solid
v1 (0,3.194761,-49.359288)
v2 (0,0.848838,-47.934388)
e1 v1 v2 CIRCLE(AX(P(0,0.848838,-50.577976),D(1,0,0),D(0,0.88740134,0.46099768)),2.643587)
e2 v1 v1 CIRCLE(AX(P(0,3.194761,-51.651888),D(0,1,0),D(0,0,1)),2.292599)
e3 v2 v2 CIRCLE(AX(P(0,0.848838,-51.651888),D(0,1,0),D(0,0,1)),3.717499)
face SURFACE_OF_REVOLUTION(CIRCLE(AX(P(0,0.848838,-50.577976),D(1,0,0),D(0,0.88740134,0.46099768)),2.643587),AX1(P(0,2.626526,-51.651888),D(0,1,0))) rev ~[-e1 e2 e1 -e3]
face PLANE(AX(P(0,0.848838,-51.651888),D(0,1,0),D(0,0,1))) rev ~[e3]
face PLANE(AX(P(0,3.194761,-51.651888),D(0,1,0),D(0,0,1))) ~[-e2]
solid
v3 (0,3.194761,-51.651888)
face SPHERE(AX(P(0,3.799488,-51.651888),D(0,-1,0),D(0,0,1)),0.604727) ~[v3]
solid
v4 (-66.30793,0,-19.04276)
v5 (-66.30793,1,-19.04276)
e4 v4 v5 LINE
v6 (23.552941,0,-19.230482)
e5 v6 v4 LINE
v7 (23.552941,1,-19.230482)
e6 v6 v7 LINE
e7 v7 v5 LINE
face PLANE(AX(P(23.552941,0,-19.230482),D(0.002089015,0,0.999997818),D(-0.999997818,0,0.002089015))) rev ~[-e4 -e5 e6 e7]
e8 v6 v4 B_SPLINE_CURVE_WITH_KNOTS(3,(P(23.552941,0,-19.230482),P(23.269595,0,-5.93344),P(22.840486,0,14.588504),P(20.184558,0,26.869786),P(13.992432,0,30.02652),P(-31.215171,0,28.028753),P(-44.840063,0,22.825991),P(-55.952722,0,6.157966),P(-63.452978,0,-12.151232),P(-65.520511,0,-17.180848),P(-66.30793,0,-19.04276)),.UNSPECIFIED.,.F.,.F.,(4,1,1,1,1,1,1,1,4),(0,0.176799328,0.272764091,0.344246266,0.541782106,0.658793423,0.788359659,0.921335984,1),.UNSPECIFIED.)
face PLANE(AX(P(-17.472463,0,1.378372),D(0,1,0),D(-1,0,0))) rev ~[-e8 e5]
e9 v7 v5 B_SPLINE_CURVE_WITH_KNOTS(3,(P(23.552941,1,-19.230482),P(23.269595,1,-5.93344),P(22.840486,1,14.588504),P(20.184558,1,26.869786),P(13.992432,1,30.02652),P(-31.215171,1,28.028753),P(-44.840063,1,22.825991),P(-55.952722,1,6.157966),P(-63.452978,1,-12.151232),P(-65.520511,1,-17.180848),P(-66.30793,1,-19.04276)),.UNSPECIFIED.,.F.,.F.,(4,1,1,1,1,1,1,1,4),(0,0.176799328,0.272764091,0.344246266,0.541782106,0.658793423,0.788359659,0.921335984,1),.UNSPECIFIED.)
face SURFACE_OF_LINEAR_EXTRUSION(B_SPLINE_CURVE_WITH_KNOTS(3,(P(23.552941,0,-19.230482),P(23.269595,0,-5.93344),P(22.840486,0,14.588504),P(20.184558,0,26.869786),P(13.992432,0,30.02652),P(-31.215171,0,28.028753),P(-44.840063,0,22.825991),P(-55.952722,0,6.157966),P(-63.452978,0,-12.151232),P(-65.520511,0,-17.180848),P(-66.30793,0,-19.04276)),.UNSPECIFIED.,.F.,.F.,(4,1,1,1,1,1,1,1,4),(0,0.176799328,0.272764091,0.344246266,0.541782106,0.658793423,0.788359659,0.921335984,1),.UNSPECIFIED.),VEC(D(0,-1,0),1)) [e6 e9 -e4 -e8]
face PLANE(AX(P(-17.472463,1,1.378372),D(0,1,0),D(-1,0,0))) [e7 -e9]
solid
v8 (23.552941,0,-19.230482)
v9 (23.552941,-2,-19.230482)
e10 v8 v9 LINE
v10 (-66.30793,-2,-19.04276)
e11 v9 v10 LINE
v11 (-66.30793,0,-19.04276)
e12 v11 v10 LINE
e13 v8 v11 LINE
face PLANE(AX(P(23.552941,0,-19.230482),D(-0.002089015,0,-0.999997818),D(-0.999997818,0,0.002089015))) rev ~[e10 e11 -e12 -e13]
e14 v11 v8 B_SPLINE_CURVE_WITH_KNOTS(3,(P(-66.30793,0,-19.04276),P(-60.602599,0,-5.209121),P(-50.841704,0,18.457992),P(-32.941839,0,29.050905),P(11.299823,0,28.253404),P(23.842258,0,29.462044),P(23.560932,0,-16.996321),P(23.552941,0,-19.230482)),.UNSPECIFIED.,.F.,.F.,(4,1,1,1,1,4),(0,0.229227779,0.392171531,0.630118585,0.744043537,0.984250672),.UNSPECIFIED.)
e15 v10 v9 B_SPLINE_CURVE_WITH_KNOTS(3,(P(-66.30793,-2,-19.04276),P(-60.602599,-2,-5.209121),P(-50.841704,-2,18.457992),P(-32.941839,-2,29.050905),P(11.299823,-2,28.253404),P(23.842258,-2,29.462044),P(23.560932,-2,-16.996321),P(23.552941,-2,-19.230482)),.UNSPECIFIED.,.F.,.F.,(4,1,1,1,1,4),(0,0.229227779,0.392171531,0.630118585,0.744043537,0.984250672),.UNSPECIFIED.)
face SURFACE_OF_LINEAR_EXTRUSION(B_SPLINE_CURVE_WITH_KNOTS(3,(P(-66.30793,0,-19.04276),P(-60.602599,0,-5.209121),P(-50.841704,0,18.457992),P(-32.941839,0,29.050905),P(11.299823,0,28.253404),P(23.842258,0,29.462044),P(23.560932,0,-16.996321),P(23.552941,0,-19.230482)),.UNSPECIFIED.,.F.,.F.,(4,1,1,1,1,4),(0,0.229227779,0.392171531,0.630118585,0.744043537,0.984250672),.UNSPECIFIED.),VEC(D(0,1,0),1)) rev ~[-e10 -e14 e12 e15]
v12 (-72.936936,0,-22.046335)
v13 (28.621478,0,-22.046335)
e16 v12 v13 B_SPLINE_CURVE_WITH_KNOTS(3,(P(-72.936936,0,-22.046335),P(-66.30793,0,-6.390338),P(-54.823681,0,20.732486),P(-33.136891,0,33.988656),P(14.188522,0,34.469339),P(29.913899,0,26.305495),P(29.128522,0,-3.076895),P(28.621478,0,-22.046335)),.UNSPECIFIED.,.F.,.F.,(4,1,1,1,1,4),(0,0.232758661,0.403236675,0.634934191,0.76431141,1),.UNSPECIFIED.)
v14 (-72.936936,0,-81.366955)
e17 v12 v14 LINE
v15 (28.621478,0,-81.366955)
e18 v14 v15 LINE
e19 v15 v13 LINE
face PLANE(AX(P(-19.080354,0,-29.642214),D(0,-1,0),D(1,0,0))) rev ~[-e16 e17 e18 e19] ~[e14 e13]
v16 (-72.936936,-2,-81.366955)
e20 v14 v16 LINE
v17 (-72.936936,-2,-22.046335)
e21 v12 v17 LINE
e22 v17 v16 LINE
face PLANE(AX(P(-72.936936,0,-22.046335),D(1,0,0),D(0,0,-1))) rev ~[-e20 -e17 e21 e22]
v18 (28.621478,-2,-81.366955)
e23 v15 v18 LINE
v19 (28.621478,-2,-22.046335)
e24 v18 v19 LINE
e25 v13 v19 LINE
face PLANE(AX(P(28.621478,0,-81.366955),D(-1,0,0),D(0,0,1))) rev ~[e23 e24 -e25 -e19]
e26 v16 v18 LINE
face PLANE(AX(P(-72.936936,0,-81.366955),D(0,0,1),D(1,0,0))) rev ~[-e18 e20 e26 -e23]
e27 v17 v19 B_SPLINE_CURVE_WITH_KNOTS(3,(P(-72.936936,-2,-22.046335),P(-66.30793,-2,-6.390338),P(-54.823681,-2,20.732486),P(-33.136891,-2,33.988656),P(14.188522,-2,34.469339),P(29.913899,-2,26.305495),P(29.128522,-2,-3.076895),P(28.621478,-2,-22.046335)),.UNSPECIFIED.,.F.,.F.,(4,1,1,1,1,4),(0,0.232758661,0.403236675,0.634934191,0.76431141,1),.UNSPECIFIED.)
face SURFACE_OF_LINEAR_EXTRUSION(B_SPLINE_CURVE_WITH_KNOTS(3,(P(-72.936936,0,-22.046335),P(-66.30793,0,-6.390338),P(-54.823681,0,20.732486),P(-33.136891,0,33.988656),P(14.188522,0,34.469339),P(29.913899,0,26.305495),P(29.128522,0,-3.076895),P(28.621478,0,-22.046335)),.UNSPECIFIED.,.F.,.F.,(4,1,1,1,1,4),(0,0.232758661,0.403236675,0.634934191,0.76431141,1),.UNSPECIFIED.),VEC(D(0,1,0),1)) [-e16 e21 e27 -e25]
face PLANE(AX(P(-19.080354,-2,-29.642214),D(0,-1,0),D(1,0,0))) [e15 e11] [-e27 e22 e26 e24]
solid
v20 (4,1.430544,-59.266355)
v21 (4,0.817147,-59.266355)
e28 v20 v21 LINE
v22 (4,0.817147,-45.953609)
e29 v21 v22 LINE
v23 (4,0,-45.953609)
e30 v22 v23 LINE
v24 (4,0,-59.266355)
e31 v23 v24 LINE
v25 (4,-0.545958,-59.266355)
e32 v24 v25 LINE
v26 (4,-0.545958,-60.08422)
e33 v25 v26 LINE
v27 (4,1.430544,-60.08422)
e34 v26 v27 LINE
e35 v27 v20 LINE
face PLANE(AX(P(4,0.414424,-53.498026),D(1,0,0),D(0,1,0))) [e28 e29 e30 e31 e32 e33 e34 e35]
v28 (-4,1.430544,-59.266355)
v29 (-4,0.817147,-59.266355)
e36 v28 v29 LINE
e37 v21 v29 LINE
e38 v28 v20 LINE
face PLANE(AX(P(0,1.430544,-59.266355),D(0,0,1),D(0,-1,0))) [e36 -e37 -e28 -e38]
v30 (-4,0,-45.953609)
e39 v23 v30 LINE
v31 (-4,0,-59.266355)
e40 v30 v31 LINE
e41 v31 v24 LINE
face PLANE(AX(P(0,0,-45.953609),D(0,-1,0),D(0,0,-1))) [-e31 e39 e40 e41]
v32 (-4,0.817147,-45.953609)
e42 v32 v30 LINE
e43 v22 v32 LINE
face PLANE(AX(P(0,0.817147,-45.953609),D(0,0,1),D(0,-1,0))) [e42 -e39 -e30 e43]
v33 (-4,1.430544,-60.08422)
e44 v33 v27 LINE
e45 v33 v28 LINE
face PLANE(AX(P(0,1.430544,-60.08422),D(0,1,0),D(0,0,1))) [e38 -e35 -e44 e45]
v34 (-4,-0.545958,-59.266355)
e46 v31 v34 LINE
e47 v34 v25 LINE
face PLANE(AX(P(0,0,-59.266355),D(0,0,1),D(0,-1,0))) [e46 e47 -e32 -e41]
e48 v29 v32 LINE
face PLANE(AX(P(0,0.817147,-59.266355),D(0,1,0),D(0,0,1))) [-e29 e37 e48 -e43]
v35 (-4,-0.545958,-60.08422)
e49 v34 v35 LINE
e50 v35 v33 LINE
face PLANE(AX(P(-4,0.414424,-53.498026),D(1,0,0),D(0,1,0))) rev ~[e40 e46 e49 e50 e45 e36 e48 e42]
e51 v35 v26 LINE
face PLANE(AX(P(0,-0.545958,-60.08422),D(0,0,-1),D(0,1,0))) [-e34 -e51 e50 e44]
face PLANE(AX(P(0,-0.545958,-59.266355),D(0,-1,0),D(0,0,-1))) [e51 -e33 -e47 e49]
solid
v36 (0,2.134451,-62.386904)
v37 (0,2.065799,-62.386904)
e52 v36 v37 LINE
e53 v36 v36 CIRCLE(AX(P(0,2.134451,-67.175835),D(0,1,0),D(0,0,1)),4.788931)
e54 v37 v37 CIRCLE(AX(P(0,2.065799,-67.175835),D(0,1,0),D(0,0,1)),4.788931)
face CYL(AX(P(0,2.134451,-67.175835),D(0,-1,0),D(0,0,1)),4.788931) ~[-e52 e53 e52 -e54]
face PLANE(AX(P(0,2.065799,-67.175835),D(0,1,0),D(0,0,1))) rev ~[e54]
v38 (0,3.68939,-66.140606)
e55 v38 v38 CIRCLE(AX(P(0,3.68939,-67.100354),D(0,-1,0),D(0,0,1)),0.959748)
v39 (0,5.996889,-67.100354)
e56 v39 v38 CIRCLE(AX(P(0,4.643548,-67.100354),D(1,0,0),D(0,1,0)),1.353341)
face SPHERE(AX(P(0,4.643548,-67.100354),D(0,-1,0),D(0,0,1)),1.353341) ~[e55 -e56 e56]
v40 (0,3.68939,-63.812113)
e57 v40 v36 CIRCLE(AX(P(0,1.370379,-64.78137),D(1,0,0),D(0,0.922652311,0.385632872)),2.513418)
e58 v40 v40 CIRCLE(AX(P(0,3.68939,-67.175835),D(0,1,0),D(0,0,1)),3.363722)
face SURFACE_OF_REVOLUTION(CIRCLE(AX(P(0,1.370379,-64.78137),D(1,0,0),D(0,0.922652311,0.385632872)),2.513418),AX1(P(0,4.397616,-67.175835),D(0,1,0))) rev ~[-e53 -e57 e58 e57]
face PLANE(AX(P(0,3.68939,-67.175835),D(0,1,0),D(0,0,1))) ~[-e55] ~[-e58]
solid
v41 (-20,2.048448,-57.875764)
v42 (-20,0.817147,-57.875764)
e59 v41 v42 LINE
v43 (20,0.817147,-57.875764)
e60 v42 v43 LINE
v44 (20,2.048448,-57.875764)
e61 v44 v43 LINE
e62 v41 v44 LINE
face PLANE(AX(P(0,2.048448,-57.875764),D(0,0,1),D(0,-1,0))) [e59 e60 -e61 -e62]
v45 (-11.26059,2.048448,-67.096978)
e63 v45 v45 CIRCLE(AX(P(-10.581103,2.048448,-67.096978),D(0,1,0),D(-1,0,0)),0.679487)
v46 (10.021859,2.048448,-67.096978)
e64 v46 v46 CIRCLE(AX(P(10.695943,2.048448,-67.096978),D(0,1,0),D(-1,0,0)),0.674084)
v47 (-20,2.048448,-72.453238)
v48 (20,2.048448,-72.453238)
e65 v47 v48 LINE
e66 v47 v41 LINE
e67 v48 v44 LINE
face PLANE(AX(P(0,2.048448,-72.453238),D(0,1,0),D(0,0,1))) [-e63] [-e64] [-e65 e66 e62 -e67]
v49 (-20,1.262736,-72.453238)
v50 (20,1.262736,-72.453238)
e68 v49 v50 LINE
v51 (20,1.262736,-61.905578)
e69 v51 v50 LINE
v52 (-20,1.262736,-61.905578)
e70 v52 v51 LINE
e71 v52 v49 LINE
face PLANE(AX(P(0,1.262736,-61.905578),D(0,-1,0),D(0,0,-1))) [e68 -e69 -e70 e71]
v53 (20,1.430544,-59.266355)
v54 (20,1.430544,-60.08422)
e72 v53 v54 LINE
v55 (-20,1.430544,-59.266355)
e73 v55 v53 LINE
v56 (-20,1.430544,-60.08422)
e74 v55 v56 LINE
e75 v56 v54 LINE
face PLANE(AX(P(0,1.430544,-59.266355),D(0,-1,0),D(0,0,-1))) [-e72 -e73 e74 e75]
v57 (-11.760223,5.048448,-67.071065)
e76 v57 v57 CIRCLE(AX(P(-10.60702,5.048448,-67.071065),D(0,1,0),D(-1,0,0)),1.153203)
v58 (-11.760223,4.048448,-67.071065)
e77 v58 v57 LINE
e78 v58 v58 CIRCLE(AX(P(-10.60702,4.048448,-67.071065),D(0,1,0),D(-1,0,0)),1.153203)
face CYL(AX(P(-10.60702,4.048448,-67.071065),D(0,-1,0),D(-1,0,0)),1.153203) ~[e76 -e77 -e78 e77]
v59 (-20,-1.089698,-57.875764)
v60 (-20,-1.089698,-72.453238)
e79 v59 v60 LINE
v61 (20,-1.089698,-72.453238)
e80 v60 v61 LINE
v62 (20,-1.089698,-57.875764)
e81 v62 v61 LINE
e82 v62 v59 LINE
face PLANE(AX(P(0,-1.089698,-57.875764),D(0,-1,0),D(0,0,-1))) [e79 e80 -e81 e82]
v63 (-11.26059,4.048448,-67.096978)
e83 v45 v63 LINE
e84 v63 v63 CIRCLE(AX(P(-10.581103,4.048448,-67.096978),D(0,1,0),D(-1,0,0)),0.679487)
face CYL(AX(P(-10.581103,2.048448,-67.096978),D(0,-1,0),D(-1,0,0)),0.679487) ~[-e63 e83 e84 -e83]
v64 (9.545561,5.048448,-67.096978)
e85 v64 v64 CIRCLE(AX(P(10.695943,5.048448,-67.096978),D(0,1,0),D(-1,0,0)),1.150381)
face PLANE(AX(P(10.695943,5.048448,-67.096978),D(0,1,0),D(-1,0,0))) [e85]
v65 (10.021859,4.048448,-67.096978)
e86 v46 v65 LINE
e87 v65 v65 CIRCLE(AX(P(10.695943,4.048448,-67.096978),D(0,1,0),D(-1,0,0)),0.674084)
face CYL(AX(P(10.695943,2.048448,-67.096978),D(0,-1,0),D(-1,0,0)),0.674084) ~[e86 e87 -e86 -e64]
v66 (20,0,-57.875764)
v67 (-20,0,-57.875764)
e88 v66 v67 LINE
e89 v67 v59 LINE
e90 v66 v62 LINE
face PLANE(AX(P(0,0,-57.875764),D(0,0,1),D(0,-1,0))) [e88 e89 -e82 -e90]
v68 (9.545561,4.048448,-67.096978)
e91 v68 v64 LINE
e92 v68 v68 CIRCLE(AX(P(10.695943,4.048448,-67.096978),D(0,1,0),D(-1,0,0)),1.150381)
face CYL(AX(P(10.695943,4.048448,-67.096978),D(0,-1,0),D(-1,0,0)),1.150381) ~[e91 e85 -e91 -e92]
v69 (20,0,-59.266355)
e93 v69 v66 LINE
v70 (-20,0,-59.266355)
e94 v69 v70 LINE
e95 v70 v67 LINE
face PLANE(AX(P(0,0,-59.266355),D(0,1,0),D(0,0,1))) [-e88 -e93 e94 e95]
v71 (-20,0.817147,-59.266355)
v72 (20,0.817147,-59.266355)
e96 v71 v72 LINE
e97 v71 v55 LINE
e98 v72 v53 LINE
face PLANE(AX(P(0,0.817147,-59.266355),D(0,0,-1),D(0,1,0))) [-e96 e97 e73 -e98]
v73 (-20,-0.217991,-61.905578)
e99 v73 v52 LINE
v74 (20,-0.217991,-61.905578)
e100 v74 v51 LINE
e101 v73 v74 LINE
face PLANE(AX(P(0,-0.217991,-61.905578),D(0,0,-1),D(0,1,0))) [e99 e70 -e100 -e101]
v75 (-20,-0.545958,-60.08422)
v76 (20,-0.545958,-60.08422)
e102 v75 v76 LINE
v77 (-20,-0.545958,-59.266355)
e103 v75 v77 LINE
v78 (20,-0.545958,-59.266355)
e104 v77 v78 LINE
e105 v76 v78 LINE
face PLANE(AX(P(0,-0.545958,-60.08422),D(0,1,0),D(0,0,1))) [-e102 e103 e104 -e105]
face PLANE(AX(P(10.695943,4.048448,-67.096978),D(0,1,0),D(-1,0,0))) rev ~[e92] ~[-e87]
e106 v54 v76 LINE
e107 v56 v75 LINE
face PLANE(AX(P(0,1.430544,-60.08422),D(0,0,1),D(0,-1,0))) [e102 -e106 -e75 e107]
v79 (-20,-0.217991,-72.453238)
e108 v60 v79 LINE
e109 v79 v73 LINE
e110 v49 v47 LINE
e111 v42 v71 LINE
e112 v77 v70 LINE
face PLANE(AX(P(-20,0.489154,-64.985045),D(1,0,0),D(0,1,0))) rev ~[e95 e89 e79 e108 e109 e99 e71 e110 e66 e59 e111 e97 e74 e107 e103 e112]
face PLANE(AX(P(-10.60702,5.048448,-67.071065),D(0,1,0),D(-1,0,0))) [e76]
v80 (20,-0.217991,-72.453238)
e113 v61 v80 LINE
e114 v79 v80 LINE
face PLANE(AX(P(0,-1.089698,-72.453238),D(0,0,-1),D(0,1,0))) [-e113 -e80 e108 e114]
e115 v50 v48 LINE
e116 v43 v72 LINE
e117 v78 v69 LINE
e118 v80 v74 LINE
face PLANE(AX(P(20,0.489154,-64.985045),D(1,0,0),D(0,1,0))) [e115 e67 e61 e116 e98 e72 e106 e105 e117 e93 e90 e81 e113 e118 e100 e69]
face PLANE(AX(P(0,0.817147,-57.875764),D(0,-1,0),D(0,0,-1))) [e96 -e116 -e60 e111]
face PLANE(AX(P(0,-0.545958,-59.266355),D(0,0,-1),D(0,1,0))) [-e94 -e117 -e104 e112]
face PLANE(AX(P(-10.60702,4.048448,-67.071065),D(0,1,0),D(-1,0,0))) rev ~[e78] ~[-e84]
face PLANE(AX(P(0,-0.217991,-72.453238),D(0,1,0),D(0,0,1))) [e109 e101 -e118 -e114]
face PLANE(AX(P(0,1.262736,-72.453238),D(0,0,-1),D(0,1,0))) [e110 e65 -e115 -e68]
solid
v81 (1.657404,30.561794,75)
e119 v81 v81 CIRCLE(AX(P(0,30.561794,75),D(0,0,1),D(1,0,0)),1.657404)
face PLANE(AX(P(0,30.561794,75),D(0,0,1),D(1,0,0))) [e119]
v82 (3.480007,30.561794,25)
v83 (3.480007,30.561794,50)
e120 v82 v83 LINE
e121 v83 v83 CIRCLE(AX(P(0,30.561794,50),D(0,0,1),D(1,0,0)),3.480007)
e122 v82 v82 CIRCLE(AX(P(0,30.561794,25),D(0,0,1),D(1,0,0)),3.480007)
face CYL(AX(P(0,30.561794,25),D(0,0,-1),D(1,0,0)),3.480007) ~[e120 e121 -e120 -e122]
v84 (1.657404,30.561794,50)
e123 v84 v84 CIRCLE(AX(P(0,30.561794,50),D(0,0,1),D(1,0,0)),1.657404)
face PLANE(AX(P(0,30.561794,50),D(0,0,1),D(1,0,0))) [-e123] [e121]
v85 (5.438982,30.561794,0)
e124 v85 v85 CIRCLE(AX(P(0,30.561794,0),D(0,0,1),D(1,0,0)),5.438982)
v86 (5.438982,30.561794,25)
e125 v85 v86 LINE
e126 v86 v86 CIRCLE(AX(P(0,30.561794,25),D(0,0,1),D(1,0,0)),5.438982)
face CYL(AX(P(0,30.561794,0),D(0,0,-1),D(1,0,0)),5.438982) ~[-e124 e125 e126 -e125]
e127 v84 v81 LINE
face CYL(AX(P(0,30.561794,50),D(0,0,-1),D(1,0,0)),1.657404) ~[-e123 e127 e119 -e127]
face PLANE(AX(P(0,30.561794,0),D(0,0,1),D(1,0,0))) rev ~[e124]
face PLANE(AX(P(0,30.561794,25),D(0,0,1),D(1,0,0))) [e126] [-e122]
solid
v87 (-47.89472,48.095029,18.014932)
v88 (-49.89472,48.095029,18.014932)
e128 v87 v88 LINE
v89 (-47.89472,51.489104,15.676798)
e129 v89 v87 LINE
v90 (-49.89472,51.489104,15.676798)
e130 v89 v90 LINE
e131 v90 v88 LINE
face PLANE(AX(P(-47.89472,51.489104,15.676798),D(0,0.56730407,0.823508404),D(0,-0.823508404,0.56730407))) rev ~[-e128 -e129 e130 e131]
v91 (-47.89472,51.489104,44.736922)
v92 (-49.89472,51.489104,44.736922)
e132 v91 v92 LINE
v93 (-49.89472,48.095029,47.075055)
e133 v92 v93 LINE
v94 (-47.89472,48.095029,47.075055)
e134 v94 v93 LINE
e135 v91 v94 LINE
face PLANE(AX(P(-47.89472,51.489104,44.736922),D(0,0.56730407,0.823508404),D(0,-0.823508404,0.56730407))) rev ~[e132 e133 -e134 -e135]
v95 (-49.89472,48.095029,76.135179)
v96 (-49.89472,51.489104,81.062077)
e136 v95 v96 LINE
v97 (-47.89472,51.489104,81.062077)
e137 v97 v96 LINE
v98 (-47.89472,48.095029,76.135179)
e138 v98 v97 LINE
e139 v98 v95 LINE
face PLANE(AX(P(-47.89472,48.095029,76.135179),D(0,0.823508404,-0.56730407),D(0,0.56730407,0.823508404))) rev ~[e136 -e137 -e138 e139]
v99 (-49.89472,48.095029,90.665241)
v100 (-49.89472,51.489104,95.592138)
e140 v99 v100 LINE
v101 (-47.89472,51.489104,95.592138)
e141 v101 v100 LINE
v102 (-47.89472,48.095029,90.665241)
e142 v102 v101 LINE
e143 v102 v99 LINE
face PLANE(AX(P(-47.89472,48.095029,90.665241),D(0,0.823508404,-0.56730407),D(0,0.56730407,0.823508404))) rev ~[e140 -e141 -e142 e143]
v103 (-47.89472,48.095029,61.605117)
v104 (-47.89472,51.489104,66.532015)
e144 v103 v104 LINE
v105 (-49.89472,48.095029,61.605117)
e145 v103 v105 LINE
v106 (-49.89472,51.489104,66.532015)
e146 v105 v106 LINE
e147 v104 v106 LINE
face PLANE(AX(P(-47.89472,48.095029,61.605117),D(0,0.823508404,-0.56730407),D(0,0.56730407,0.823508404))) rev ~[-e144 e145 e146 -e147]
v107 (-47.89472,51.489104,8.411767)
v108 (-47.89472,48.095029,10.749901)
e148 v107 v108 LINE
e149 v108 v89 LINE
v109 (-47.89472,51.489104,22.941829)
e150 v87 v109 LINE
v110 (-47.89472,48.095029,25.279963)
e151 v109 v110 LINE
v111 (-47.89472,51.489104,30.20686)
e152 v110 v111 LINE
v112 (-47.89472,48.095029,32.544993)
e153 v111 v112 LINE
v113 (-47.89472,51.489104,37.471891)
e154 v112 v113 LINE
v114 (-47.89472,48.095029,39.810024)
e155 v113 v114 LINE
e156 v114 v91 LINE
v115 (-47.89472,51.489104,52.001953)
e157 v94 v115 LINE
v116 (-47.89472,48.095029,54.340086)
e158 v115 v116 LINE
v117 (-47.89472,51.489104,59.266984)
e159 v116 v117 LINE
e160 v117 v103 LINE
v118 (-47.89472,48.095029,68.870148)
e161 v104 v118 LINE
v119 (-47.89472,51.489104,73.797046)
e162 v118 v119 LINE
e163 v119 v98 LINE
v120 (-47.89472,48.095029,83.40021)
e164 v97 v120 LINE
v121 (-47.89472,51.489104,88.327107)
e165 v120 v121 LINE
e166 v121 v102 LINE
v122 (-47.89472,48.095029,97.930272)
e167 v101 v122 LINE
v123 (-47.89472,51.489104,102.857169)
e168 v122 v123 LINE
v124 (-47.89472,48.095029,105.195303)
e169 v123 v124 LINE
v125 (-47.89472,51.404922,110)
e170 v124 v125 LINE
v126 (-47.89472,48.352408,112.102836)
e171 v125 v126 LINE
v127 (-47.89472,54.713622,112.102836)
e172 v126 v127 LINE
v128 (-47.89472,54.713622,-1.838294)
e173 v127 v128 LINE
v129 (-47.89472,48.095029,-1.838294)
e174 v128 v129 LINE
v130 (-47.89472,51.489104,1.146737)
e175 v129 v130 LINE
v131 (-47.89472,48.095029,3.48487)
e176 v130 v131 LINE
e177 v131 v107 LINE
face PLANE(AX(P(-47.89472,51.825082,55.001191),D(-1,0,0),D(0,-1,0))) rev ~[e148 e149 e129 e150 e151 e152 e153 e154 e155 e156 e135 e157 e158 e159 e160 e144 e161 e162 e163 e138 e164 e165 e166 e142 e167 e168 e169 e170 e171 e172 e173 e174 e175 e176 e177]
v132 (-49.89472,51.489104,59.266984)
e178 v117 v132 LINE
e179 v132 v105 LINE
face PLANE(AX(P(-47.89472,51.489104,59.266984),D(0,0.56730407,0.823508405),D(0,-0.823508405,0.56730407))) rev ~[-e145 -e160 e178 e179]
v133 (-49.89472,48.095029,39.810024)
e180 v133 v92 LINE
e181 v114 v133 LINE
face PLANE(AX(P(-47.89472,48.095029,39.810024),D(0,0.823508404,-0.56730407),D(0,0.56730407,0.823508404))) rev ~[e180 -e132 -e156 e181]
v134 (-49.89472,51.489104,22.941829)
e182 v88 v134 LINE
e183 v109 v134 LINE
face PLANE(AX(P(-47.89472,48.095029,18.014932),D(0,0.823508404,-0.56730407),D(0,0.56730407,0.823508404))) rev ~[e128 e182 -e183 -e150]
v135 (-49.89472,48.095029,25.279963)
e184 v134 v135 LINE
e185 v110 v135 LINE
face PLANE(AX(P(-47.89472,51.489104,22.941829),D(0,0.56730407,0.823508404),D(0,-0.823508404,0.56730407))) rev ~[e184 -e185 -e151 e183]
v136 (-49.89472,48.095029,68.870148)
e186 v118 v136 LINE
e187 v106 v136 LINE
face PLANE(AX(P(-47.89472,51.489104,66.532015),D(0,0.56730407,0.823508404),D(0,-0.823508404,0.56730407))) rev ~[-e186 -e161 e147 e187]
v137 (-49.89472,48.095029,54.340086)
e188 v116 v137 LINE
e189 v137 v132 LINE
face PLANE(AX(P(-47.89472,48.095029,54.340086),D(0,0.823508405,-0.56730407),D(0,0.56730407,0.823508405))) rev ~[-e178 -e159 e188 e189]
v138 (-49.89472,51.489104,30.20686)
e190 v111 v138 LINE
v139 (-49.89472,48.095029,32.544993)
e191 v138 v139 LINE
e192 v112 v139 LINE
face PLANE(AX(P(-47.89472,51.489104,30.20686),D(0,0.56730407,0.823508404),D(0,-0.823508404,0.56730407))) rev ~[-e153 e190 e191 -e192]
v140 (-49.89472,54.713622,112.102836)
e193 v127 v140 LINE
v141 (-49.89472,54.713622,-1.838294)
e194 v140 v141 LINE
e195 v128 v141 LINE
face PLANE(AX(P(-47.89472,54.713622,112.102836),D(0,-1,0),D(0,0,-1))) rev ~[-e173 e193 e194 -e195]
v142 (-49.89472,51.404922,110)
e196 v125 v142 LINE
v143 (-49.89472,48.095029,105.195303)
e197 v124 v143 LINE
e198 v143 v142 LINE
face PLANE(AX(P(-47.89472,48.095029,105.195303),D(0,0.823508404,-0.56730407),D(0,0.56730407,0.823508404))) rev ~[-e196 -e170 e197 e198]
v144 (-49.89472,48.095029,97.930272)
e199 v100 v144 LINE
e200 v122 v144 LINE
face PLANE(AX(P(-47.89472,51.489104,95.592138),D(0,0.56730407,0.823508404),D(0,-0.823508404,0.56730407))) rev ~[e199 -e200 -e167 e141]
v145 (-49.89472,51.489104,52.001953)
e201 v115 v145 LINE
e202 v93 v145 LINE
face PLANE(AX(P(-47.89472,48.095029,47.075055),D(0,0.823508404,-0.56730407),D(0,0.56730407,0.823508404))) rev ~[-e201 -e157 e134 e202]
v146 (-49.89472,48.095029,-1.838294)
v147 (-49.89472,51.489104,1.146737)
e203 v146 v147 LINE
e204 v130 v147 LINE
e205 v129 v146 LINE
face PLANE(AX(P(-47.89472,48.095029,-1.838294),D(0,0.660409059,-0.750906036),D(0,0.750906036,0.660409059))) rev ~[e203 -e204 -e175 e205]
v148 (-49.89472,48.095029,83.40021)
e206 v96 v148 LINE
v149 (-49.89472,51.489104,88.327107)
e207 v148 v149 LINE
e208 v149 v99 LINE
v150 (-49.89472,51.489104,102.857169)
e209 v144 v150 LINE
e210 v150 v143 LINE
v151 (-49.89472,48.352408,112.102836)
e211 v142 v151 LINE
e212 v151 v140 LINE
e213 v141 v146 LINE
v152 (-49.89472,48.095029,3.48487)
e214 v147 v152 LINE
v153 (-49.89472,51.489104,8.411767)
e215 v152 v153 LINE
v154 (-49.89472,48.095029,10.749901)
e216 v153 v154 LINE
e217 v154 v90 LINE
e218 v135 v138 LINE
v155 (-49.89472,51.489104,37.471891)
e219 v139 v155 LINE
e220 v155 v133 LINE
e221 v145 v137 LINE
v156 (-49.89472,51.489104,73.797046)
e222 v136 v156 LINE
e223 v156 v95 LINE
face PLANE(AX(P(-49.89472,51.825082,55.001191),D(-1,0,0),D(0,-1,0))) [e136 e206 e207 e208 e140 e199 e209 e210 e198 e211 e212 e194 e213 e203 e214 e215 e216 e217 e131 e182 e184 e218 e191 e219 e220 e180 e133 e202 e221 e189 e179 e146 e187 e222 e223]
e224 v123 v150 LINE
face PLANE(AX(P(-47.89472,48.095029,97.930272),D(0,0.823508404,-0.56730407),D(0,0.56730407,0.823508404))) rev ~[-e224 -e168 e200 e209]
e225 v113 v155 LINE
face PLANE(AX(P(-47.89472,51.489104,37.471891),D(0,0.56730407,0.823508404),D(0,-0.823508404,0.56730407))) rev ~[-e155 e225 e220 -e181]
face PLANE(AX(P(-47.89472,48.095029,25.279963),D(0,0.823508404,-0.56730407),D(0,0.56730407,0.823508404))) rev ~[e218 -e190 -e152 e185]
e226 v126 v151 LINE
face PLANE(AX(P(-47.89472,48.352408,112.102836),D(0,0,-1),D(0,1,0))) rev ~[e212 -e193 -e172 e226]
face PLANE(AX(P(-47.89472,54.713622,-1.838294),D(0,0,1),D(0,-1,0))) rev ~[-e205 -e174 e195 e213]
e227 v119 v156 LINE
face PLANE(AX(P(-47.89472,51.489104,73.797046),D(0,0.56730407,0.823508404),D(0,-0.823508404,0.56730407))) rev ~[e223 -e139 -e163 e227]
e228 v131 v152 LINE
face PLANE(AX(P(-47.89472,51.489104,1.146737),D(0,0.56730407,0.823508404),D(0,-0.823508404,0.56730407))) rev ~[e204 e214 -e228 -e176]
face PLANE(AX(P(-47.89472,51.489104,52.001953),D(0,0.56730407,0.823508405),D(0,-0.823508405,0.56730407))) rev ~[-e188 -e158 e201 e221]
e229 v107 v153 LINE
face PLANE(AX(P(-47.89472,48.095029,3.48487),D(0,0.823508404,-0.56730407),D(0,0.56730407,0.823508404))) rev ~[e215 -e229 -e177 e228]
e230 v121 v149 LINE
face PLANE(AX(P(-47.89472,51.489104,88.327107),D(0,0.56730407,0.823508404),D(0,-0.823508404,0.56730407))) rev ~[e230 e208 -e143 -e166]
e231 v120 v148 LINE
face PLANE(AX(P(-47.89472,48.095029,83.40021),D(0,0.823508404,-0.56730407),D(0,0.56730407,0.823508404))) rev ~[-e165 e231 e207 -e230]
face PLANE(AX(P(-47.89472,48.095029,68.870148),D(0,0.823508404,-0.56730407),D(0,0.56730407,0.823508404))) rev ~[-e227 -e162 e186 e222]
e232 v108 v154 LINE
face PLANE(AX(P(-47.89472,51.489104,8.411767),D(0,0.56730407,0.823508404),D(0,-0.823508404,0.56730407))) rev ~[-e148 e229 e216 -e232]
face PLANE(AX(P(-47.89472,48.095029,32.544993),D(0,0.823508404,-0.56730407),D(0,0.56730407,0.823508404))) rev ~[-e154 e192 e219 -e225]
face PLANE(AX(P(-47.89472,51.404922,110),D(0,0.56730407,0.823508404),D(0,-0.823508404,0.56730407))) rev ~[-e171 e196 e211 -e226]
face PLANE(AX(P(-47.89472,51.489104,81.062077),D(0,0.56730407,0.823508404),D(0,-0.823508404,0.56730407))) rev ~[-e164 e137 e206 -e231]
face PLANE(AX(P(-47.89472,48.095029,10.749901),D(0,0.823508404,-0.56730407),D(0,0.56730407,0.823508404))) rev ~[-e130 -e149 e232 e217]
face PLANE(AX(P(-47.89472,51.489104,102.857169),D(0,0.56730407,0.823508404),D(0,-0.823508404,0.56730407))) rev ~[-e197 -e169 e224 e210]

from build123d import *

# Parameters (mm, degrees)
F1_DEPTH  = 2
F3_DEPTH  = 1
F5_DEPTH  = 20
F6_R      = 0.6740837688
F6_R_2    = 0.6794872763
F7_DEPTH  = 2
F8_R      = 1.1503813394
F8_R_2    = 1.1532026448
F9_DEPTH  = 1
F14_W     = 3.547757864
F14_H     = 3.547757864
F15_DEPTH = 110
F16_DEPTH = 4
F17_R     = 5.4389816306
F18_DEPTH = 25
F19_R     = 3.4800068769
F20_DEPTH = 25
F21_R     = 1.6574043711
F22_DEPTH = 25
F25_DEPTH = 25
F27_DEPTH = 2


# Not quite as in the source:
# - a feature names something its author has since deleted; it is built from what else it names


with BuildPart() as f1:
    # F0 (on Front) → F1 (new body)
    with BuildSketch(Plane.XZ):
        with BuildLine():
            Line((-72.9369357123, -81.3669546917), (28.6214776443, -81.3669546917))
            Line((28.6214776443, -81.3669546917), (28.6214776443, -22.0463353619))
            add(Edge.make_bspline(
                [(-72.9369357123, -22.0463353619), (-66.3079296953, -6.3903379982), (-54.8236810491, 20.7324864598), (-33.1368908634, 33.9886563081), (14.1885215953, 34.4693387216), (29.9138992328, 26.3054952003), (29.1285218253, -3.0768949366), (28.6214776443, -22.0463353619)],
                knots=[0, 0, 0, 0, 0.2327586614, 0.4032366747, 0.6349341911, 0.7643114096, 1, 1, 1, 1], degree=3))
            Line((-72.9369357123, -22.0463353619), (-72.9369357123, -81.3669546917))
        make_face()
        with BuildLine():
            Line((23.5529407965, -19.2304815576), (-66.3079296953, -19.0427604541))
            add(Edge.make_bspline(
                [(-66.3079296953, -19.0427604541), (-60.6025988038, -5.2091205775), (-50.8417035049, 18.4579923395), (-32.9418385651, 29.0509048337), (11.2998233245, 28.2534036027), (23.8422582571, 29.4620440208), (23.5609324216, -16.9963213799), (23.5529407965, -19.2304815576)],
                knots=[0, 0, 0, 0, 0.2292277789, 0.3921715308, 0.6301185848, 0.7440435368, 0.9842506716, 0.9842506716, 0.9842506716, 0.9842506716], degree=3))
        make_face(mode=Mode.SUBTRACT)
    extrude(amount=F1_DEPTH)


with BuildPart() as f3:
    # F2 (on face) → F3 (new body)
    with BuildSketch(Plane(origin=(0, 0, 0), x_dir=(-1, 0, 0), z_dir=(0, 1, 0))):
        with BuildLine():
            Line((-23.5529407964, -19.2304815668), (66.3079296953, -19.0427604541))
            add(Edge.make_bspline(
                [(-23.5529407964, -19.2304815668), (-23.269595086, -5.9334404727), (-22.8404862365, 14.5885042855), (-20.184558271, 26.8697861091), (-13.9924322403, 30.0265202781), (31.2151711749, 28.02875343), (44.8400626895, 22.8259909303), (55.9527219343, 6.1579662544), (63.45297845, -12.1512318258), (65.5205113196, -17.1808483014), (66.3079296953, -19.0427604541)],
                knots=[0, 0, 0, 0, 0.1767993283, 0.2727640909, 0.3442462663, 0.5417821056, 0.6587934226, 0.788359659, 0.9213359844, 1, 1, 1, 1], degree=3))
        make_face()
    extrude(amount=F3_DEPTH)


with BuildPart() as f5:
    # F4 (on Right) → F5 (new body, symmetric)
    with BuildSketch(Plane.YZ):
        Polygon((-1.0896978201, -57.8757636249), (-1.0896978201, -72.45323807), (-0.2179905568, -72.45323807), (-0.2179905568, -61.9055777788), (1.2627355754, -61.9055777788), (1.2627355754, -72.45323807), (2.0484484266, -72.45323807), (2.0484484266, -57.8757636249), (0.8171472582, -57.8757636249), (0.8171472582, -59.2663548887), (1.4305444201, -59.2663548887), (1.4305444201, -60.084220022), (-0.5459576496, -60.084220022), (-0.5459576496, -59.2663548887), (0, -59.2663548887), (0, -57.8757636249), align=None)
    extrude(amount=F5_DEPTH, both=True)

    # F6 (on face) → F7 (join)
    with BuildSketch(Plane(origin=(0, 2.0484484266, 0), x_dir=(-1, 0, 0), z_dir=(0, 1, 0))):
        with Locations((-10.6959426776, -67.096978426)):
            Circle(F6_R)
        with Locations((10.5811031535, -67.096978426)):
            Circle(F6_R_2)
    extrude(amount=F7_DEPTH)

    # F8 (on face) → F9 (join)
    with BuildSketch(Plane(origin=(0, 4.0484484266, 0), x_dir=(-1, 0, 0), z_dir=(0, 1, 0))):
        with Locations((-10.6959426776, -67.096978426)):
            Circle(F8_R)
        with Locations((10.6070199981, -67.0710653067)):
            Circle(F8_R_2)
    extrude(amount=F9_DEPTH)


with BuildPart() as f11:
    # F10 (on Right) → F11 (revolve)
    with BuildSketch(Plane.YZ):
        with BuildLine():
            Line((2.1344509079, -62.3869039118), (2.0657987334, -62.3869039118))
            Line((2.0657987334, -62.3869039118), (2.0657987334, -67.175835371))
            Line((2.0657987334, -67.175835371), (3.6893903743, -67.175835371))
            Line((3.6893903743, -67.175835371), (3.6893903743, -63.812112902))
            ThreePointArc((3.6893903743, -63.812112902), (3.0686592581, -62.9285025663), (2.1344509079, -62.3869039118))
        make_face()
    revolve(axis=Axis((0, 4.3976157904, -67.175835371), (0, 1, 0)))

    # F12 (on Right) → F13 (revolve)
    with BuildSketch(Plane.YZ):
        with BuildLine():
            Line((3.290206524, -67.100353539), (5.9968891046, -67.100353539))
            ThreePointArc((5.9968891046, -67.100353539), (4.6435478143, -65.7470122487), (3.290206524, -67.100353539))
        make_face()
    revolve(axis=Axis((0, 4.8515796661, -67.100353539), (0, 1, 0)))


with BuildPart() as f15:
    # F14 (on Top) → F15 (new body)
    with BuildSketch(Plane.XY):
        with Locations((-46.1208410561, 48.1243357062)):
            Rectangle(F14_W, F14_H)
    extrude(amount=F15_DEPTH)

    # F14 (on Top) → F25 (join)
    with BuildSketch(Plane.XY):
        with Locations((-46.1208410561, 48.1243357062)):
            Rectangle(F14_W, F14_H)
    extrude(amount=F25_DEPTH)


with BuildPart() as f16:
    # F4 (on Right) → F16 (new body, symmetric)
    with BuildSketch(Plane.YZ):
        Polygon((0, -45.9536090493), (0, -57.8757636249), (0, -59.2663548887), (-0.5459576496, -59.2663548887), (-0.5459576496, -60.084220022), (1.4305444201, -60.084220022), (1.4305444201, -59.2663548887), (0.8171472582, -59.2663548887), (0.8171472582, -57.8757636249), (0.8171472582, -45.9536090493), align=None)
    extrude(amount=F16_DEPTH, both=True)


with BuildPart() as f18:
    # F17 (on Top) → F18 (new body)
    with BuildSketch(Plane.XY):
        with Locations((0, 30.5617935956)):
            Circle(F17_R)
    extrude(amount=F18_DEPTH)

    # F19 (on face) → F20 (join)
    with BuildSketch(Plane.XY.offset(25)):
        with Locations((0, 30.5617935956)):
            Circle(F19_R)
    extrude(amount=F20_DEPTH)

    # F21 (on face) → F22 (join)
    with BuildSketch(Plane.XY.offset(50)):
        with Locations((0, 30.5617935956)):
            Circle(F21_R)
    extrude(amount=F22_DEPTH)


with BuildPart() as f24:
    # F23 (on Right) → F24 (revolve)
    with BuildSketch(Plane.YZ):
        with BuildLine():
            ThreePointArc((4.4042146765, -51.6518875957), (3.7994878367, -51.0471607558), (3.1947609968, -51.6518875957))
            Line((3.1947609968, -51.6518875957), (4.4042146765, -51.6518875957))
        make_face()
    revolve(axis=Axis((0, 2.626526315, -51.6518875957), (0, 1, 0)))


with BuildPart() as f24b:
    # F23 (on Right) → F24, piece 2 (revolve)
    with BuildSketch(Plane.YZ):
        with BuildLine():
            ThreePointArc((3.1947609968, -49.3592881282), (2.2212167521, -48.3185221094), (0.8488379535, -47.9343883626))
            Line((0.8488379535, -47.9343883626), (0.8488379535, -51.6518875957))
            Line((0.8488379535, -51.6518875957), (3.1947609968, -51.6518875957))
            Line((3.1947609968, -51.6518875957), (3.1947609968, -49.3592881282))
        make_face()
    revolve(axis=Axis((0, 2.626526315, -51.6518875957), (0, 1, 0)))


with BuildPart() as f27:
    # F26 (on face) → F27 (new body)
    with BuildSketch(Plane(origin=(-47.8947199881, 0, 0), x_dir=(0, -1, 0), z_dir=(-1, 0, 0))):
        Polygon((-51.4049215033, 110), (-48.3524078404, 112.1028363705), (-54.7136217356, 112.1028363705), (-54.7136217356, -1.8382943235), (-48.0950288475, -1.8382943235), (-51.4891035855, 1.1467365548), (-48.0950288475, 3.4848698415), (-51.4891035855, 8.4117674623), (-48.0950288475, 10.749900749), (-51.4891035855, 15.6767983698), (-48.0950288475, 18.0149316565), (-51.4891035855, 22.9418292773), (-48.0950288475, 25.279962564), (-51.4891035855, 30.2068601848), (-48.0950288475, 32.5449934715), (-51.4891035855, 37.4718910923), (-48.0950288475, 39.810024379), (-51.4891035855, 44.7369219998), (-48.0950288475, 47.0750552865), (-51.4891035855, 52.0019529073), (-48.0950288475, 54.3400861939), (-51.4891035855, 59.2669838148), (-48.0950288475, 61.6051171014), (-51.4891035855, 66.5320147222), (-48.0950288475, 68.8701480089), (-51.4891035855, 73.7970456297), (-48.0950288475, 76.1351789164), (-51.4891035855, 81.0620765372), (-48.0950288475, 83.4002098239), (-51.4891035855, 88.3271074447), (-48.0950288475, 90.6652407314), (-51.4891035855, 95.5921383522), (-48.0950288475, 97.9302716389), (-51.4891035855, 102.8571692597), (-48.0950288475, 105.1953025464), align=None)
    extrude(amount=F27_DEPTH)


solid = Compound([f1.part, f3.part, f5.part, f11.part, f16.part, f18.part, f24.part, f24b.part, f27.part])
